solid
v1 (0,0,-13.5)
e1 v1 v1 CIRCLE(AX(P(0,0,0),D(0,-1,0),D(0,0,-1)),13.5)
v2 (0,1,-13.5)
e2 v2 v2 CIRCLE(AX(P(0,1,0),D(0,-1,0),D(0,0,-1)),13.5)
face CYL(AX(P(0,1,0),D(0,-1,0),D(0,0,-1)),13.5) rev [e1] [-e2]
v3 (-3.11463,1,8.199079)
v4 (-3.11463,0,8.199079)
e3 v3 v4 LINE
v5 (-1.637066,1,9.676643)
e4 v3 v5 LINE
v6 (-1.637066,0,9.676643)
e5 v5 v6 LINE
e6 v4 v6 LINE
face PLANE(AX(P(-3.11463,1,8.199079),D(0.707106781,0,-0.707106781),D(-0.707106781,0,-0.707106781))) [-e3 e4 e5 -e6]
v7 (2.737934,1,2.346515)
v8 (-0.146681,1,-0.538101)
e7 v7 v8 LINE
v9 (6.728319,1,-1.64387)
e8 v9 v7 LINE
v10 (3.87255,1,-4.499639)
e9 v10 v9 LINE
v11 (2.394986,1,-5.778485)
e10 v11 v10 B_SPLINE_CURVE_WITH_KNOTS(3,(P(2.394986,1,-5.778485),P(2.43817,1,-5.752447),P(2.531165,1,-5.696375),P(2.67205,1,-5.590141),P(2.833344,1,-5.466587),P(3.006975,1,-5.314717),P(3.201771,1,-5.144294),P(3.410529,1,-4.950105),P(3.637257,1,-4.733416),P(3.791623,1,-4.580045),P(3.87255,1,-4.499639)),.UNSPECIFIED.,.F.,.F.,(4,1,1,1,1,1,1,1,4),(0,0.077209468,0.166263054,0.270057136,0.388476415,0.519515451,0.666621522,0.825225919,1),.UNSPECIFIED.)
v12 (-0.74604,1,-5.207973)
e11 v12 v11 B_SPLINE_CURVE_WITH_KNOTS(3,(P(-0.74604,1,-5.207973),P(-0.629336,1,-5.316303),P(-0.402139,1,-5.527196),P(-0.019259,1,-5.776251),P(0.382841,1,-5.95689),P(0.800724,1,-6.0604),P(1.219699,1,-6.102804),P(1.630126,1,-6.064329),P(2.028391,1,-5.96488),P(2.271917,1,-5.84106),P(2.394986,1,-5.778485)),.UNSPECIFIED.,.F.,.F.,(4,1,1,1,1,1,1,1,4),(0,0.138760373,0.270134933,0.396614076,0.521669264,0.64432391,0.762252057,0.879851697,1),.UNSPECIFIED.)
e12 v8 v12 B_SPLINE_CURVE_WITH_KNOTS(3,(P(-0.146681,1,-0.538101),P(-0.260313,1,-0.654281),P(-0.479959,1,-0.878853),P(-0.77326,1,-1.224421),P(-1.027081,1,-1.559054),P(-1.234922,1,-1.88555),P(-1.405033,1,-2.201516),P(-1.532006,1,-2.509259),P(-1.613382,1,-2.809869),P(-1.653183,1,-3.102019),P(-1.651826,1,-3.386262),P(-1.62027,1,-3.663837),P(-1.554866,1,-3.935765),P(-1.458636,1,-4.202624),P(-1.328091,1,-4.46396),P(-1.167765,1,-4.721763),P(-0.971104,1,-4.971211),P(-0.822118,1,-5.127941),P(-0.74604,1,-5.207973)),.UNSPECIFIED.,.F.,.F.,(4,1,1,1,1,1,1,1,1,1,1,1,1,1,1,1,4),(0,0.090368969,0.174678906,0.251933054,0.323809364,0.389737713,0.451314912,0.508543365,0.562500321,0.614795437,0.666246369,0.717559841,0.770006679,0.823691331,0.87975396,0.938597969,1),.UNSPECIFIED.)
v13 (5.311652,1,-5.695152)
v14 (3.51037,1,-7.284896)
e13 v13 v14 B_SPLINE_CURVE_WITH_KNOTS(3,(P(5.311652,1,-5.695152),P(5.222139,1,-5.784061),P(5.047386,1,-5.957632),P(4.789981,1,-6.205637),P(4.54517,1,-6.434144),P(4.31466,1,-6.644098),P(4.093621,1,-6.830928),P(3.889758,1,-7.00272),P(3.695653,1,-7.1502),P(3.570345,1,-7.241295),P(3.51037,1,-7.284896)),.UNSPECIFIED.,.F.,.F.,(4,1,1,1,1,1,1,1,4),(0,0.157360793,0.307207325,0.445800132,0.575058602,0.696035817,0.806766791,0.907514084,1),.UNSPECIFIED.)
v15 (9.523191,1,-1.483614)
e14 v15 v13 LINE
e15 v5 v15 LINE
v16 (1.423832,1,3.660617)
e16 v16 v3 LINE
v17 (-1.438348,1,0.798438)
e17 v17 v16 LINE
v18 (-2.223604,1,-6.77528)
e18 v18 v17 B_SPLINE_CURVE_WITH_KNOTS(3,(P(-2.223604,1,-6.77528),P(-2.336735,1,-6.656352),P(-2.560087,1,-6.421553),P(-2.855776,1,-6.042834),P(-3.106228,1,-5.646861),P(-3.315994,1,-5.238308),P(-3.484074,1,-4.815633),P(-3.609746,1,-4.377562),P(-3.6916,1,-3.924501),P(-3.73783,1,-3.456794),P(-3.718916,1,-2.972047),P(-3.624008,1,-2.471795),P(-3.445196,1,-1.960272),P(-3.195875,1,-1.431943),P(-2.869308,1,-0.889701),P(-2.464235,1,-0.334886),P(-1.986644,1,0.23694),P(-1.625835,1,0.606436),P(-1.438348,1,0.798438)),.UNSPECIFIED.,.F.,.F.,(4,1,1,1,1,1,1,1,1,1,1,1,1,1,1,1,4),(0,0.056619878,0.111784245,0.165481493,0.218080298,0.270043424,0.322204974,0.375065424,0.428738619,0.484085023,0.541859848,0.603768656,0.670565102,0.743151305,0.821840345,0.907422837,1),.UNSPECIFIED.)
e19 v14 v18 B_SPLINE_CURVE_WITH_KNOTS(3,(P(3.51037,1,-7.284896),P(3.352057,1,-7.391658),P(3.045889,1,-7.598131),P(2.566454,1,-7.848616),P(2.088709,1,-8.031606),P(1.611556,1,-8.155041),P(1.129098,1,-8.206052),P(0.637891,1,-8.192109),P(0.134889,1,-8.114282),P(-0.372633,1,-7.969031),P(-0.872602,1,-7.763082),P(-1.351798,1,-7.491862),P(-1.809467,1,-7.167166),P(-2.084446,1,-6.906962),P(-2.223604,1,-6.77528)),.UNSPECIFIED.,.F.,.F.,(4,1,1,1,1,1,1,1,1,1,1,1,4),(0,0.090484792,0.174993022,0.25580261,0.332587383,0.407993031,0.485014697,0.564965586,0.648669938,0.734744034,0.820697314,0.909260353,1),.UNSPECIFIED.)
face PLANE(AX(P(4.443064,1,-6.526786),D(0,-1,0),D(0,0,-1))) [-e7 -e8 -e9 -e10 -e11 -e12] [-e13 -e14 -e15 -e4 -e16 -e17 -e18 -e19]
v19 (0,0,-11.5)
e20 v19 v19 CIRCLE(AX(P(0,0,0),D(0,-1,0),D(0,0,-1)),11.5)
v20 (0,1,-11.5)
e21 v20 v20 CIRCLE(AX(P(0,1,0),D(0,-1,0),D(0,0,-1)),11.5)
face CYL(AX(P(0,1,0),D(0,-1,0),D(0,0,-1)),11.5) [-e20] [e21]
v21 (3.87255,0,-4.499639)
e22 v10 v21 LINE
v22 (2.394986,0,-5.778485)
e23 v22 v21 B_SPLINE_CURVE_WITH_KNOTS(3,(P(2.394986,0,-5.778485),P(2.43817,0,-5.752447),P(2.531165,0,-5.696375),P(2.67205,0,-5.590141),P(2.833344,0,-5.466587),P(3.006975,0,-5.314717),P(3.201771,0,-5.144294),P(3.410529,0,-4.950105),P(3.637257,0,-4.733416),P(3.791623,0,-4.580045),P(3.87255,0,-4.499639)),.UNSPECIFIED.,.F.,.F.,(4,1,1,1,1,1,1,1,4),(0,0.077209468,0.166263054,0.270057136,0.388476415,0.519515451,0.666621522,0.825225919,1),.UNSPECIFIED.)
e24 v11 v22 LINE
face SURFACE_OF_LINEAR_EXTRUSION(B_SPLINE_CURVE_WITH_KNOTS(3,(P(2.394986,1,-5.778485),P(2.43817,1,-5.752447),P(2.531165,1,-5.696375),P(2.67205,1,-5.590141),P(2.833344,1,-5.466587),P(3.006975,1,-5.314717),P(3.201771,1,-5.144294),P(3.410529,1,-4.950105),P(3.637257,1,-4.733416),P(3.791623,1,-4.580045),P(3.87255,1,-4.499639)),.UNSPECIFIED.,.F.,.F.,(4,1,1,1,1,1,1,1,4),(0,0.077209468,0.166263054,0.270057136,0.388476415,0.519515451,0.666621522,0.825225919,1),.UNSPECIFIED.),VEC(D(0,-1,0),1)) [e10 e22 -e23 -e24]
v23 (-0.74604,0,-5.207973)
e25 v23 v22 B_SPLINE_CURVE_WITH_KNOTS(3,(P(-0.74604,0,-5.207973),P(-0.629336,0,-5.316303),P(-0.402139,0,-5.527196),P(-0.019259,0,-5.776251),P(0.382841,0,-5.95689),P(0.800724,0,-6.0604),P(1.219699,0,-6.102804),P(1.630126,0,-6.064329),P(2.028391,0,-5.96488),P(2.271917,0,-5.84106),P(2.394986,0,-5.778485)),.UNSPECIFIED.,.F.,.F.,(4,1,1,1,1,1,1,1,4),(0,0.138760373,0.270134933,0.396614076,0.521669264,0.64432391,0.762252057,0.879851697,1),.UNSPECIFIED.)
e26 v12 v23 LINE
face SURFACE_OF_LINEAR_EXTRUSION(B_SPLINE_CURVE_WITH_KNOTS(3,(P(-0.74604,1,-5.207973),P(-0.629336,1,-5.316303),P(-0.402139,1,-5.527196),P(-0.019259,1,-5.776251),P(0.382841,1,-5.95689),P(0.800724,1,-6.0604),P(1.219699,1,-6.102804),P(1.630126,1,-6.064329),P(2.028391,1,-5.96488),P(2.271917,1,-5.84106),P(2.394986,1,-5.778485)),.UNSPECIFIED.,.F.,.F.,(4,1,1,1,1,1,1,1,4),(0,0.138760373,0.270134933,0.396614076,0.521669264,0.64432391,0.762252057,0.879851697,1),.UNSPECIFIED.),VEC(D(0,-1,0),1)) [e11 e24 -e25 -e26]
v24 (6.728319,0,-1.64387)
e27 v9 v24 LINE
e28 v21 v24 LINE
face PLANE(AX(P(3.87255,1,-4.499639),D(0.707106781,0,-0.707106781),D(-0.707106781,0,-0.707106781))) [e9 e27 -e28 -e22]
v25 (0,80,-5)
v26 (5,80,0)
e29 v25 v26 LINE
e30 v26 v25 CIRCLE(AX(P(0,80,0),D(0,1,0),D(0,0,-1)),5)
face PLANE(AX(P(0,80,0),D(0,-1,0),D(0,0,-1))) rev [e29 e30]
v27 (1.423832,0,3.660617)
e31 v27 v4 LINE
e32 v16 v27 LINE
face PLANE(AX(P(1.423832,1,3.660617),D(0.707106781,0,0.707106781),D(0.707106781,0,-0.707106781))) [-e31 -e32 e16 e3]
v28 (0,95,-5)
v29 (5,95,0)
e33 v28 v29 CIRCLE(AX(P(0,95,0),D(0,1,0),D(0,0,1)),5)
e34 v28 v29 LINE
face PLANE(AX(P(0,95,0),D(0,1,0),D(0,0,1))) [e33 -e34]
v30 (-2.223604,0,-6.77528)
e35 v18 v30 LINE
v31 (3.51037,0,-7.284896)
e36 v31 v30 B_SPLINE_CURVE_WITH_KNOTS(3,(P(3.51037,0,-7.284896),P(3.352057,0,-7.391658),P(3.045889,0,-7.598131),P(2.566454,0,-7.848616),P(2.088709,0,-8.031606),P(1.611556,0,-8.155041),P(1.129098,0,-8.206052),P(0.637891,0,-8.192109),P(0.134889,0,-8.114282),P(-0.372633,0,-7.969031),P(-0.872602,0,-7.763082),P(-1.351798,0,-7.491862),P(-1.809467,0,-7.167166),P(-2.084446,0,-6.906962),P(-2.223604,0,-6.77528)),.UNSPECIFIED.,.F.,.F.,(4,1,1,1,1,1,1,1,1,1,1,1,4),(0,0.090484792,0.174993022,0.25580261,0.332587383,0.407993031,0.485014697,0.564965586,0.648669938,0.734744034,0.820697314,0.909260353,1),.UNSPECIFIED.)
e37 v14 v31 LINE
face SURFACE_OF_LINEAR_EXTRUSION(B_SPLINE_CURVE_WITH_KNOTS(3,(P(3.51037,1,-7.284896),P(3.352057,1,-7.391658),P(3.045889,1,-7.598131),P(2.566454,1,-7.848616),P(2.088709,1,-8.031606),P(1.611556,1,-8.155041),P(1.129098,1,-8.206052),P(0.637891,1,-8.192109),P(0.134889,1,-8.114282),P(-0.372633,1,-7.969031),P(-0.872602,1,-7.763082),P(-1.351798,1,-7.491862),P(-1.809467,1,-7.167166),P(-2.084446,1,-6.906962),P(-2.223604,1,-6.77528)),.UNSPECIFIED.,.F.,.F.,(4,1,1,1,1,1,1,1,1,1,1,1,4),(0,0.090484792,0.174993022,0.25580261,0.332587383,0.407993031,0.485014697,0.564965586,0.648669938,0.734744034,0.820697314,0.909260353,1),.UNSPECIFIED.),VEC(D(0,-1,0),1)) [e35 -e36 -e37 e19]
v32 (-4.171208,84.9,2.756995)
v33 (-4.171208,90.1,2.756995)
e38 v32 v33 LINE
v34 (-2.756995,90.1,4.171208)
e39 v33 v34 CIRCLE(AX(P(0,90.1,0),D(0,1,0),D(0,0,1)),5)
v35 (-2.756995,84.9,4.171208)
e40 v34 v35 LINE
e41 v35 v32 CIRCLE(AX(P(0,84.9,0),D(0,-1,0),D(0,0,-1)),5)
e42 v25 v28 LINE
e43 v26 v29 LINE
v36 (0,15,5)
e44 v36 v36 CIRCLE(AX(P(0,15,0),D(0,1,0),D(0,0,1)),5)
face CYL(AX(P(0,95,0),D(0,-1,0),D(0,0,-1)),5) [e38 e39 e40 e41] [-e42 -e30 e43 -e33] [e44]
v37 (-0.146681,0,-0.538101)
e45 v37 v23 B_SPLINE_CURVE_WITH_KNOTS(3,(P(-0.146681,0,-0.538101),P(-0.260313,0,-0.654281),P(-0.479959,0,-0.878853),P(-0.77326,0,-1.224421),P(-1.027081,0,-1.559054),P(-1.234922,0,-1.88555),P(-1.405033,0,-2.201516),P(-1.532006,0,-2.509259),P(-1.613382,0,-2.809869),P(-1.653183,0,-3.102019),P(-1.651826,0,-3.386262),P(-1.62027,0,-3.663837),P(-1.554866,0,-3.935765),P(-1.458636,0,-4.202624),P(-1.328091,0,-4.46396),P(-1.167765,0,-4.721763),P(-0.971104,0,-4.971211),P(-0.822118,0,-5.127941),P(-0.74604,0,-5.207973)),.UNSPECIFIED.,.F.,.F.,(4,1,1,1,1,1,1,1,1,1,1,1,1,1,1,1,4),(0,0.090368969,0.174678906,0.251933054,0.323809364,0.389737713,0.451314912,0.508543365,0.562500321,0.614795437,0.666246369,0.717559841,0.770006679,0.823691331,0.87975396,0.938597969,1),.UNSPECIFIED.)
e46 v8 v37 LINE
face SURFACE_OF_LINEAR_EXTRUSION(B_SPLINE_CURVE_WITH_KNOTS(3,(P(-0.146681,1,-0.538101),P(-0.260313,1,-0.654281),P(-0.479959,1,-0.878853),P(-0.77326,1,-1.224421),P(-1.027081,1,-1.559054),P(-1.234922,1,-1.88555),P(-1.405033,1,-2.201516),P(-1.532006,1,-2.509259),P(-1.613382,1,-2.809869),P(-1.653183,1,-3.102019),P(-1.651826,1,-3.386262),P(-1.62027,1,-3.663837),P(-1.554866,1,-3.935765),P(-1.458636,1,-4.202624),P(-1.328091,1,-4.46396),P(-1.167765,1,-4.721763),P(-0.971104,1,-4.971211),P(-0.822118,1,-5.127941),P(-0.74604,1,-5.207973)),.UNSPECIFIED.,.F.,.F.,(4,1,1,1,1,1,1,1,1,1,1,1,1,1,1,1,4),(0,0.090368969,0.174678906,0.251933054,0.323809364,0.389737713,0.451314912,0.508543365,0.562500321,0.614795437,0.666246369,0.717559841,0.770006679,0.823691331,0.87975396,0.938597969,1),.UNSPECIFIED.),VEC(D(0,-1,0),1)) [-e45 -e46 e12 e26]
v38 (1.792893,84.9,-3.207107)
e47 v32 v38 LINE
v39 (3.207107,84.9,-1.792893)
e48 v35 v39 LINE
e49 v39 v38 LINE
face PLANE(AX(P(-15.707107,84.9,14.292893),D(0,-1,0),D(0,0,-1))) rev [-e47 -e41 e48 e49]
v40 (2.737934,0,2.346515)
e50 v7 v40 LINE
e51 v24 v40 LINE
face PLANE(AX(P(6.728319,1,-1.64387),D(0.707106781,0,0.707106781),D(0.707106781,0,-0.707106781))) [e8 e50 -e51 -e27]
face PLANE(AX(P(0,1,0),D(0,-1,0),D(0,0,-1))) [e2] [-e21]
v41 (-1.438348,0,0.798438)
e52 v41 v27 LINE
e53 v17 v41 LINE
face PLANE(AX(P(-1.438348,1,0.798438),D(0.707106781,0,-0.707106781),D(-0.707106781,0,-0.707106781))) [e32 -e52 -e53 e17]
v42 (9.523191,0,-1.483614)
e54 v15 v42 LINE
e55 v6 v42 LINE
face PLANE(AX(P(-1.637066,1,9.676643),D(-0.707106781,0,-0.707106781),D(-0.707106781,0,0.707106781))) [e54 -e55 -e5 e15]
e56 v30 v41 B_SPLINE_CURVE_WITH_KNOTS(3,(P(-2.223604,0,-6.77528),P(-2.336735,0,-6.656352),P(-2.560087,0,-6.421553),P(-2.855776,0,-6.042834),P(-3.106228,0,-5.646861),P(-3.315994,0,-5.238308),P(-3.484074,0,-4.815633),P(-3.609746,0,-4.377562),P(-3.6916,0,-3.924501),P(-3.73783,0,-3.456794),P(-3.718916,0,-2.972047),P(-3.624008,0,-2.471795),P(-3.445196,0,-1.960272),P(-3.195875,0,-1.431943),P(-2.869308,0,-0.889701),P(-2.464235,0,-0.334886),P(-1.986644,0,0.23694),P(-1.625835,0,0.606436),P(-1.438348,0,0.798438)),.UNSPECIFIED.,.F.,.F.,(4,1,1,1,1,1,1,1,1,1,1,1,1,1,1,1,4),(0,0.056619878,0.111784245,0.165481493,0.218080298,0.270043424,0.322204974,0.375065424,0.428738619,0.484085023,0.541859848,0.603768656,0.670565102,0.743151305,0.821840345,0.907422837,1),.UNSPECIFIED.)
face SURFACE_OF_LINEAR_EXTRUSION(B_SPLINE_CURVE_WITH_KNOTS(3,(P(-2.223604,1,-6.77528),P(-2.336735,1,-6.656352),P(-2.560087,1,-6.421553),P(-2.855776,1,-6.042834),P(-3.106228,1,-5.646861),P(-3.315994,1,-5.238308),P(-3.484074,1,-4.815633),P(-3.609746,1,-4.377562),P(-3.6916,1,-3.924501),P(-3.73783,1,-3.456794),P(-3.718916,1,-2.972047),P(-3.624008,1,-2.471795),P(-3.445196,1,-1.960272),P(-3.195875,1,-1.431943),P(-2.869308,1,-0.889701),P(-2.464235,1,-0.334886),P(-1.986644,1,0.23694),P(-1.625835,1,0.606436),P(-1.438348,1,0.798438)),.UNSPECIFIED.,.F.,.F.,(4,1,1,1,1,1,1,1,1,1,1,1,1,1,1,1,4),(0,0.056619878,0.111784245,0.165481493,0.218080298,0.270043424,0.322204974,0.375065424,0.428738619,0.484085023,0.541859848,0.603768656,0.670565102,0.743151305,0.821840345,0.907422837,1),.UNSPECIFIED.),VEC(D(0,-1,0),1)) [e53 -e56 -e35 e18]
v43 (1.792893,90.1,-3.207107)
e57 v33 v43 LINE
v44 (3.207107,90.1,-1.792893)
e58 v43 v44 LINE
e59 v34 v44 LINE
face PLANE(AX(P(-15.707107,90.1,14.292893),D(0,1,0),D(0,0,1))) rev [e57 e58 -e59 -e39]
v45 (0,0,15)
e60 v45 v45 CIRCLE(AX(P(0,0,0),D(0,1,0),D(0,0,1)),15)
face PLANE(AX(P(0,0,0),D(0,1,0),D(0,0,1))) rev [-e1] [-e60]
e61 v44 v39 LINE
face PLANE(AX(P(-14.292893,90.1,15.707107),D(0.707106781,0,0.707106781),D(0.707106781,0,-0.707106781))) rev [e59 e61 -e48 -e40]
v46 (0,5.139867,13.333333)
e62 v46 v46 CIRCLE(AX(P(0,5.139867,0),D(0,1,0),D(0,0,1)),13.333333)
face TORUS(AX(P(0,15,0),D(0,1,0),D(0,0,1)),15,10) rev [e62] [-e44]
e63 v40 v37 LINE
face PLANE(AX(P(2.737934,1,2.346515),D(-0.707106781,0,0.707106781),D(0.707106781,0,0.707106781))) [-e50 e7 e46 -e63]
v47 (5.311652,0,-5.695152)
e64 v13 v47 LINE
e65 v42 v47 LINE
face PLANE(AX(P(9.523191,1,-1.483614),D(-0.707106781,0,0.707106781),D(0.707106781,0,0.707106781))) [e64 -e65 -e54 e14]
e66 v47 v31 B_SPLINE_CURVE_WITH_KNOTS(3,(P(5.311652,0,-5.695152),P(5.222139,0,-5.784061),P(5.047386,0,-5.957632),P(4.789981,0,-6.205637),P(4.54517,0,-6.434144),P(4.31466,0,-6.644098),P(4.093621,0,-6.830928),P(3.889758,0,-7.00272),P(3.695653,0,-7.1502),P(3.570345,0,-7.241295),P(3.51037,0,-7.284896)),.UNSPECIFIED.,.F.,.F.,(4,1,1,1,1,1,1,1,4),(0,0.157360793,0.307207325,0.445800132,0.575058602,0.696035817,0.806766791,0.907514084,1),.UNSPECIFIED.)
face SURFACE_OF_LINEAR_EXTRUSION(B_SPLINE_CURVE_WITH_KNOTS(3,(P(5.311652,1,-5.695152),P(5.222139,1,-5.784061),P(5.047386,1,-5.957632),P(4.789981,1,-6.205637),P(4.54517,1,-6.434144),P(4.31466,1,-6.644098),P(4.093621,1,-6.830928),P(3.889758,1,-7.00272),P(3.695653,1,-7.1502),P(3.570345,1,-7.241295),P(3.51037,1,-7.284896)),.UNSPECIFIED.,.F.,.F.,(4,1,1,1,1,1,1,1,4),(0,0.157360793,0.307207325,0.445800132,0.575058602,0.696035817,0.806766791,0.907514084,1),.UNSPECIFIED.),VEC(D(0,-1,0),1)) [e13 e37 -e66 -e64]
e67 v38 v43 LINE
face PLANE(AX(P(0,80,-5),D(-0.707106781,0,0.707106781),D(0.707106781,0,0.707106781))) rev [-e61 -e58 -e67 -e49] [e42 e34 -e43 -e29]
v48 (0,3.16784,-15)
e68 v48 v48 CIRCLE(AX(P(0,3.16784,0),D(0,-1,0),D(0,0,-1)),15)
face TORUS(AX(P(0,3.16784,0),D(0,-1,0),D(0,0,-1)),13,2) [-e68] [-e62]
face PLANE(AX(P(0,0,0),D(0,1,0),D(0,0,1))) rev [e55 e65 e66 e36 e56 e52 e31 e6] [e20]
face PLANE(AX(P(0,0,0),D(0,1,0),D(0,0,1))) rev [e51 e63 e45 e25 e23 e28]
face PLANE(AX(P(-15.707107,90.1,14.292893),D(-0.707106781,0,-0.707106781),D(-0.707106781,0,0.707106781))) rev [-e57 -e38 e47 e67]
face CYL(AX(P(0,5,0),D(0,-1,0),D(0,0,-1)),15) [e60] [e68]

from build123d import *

# Parameters (mm, degrees)
SKETCH1_R           = 15
BOSS_EXTRUDE1_DEPTH = 5
SKETCH2_R           = 5
BOSS_EXTRUDE2_DEPTH = 90
CUT_EXTRUDE1_START  = -15
CUT_EXTRUDE1_DEPTH  = 15
SKETCH4_W           = 2
SKETCH4_H           = 5.2
CUT_EXTRUDE2_DEPTH  = 99.17076958
FILLET1_R           = 10
FILLET2_R           = 2
CUT_EXTRUDE3_DEPTH  = 1
SKETCH6_R           = 13.5
SKETCH6_R_2         = 11.5
CUT_EXTRUDE4_DEPTH  = 1


with BuildPart() as part:
    # Sketch1 → Boss-Extrude1 (new body)
    with BuildSketch(Plane(origin=(0, 0, 0), x_dir=(1, 0, 0), z_dir=(0, 1, 0))):
        with Locations(Location((0, 0, 0), (0, 0, 270))):
            Circle(SKETCH1_R)
    extrude(amount=BOSS_EXTRUDE1_DEPTH)

    # Sketch2 → Boss-Extrude2 (add)
    with BuildSketch(Plane(origin=(0, 5, 0), x_dir=(1, 0, 0), z_dir=(0, 1, 0))):
        with Locations(Location((0, 0, 0), (0, 0, 90))):
            Circle(SKETCH2_R)
    extrude(amount=BOSS_EXTRUDE2_DEPTH)

    # Sketch3 → Cut-Extrude1 (cut)
    with BuildSketch(Plane(origin=(0, 95, 0), x_dir=(1, 0, 0), z_dir=(0, 1, 0)).offset(CUT_EXTRUDE1_START)):
        with BuildLine():
            Line((0, 5), (5, 0))
            ThreePointArc((5, 0), (3.535533906, 3.535533906), (0, 5))
        make_face()
    extrude(amount=CUT_EXTRUDE1_DEPTH, mode=Mode.SUBTRACT)

    # Sketch4 → Cut-Extrude2 (cut, through all)
    with BuildSketch(Plane(origin=(2.5, 0, -2.5), x_dir=(-0.7071067811865475, 0, -0.7071067811865477), z_dir=(0.7071067811865477, 0, -0.7071067811865475))):
        with Locations((0, 87.5)):
            Rectangle(SKETCH4_W, SKETCH4_H)
    extrude(amount=-CUT_EXTRUDE2_DEPTH, mode=Mode.SUBTRACT)

    # Fillet1
    fillet1_edges = [part.edges().sort_by_distance(p)[0] for p in [
        (0, 5, 5),
    ]]
    fillet(fillet1_edges, radius=FILLET1_R - 0.0001)  # a hair under: the kernel refuses the full size

    # Fillet2
    fillet2_edges = [part.edges().sort_by_distance(p)[0] for p in [
        (0, 5, -15),
    ]]
    fillet(fillet2_edges, radius=FILLET2_R)

    # Sketch5 → Cut-Extrude3 (cut)
    with BuildSketch(Plane.XZ):
        with BuildLine():
            Line((-1.637065711, 9.676642787), (9.523190699, -1.483613623))
            Line((9.523190699, -1.483613623), (5.311652237, -5.695152084))
            add(Edge.make_bspline(
                [(5.311652237, -5.695152084), (5.222138514, -5.784060594), (5.04738551, -5.957632072), (4.789980879, -6.205637327), (4.545170464, -6.434144406), (4.314659572, -6.644098006), (4.09362148, -6.830927906), (3.889758382, -7.002719589), (3.69565283, -7.150200035), (3.570345293, -7.241295339), (3.510370186, -7.284895674)],
                knots=[0, 0, 0, 0, 1.258886347, 2.457658598, 3.566401057, 4.600468819, 5.568286539, 6.454134328, 7.260112675, 8, 8, 8, 8], degree=3))
            add(Edge.make_bspline(
                [(3.510370186, -7.284895674), (3.352057488, -7.391657893), (3.045888719, -7.598130638), (2.566454347, -7.848616029), (2.088709315, -8.031605789), (1.611555846, -8.155041162), (1.129098311, -8.206051584), (0.637891361, -8.192108975), (0.134888923, -8.11428248), (-0.372633356, -7.969030769), (-0.872601546, -7.763082396), (-1.351797855, -7.491862034), (-1.809467136, -7.167166368), (-2.084445811, -6.906961882), (-2.223604173, -6.775280289)],
                knots=[0, 0, 0, 0, 1.085817505, 2.099916266, 3.069631314, 3.991048598, 4.895916369, 5.820176367, 6.779587027, 7.784039251, 8.816928408, 9.848367769, 10.911124231, 12, 12, 12, 12], degree=3))
            add(Edge.make_bspline(
                [(-2.223604173, -6.775280289), (-2.336734542, -6.656352184), (-2.56008707, -6.421553226), (-2.855775684, -6.042833727), (-3.106227984, -5.64686054), (-3.315994358, -5.238308237), (-3.484073648, -4.815633421), (-3.609745523, -4.377562245), (-3.691600055, -3.924500762), (-3.737830146, -3.456793519), (-3.718915595, -2.972046746), (-3.62400832, -2.471794707), (-3.445196287, -1.960272191), (-3.195874633, -1.431943292), (-2.869308405, -0.889700641), (-2.464234681, -0.334885684), (-1.986644206, 0.236940057), (-1.625835114, 0.606436234), (-1.438347763, 0.798437659)],
                knots=[0, 0, 0, 0, 0.905918046, 1.788547915, 2.647703894, 3.489284766, 4.320694788, 5.155279578, 6.001046779, 6.859817908, 7.745360365, 8.669757575, 9.660298499, 10.729041634, 11.890420876, 13.149445516, 14.5187654, 16, 16, 16, 16], degree=3))
            Line((-1.438347763, 0.798437659), (1.423831724, 3.660617146))
            Line((1.423831724, 3.660617146), (-3.114629814, 8.199078685))
            Line((-3.114629814, 8.199078685), (-1.637065711, 9.676642787))
        make_face()
        with BuildLine():
            Line((2.737934289, 2.346514582), (-0.146681096, -0.538100802))
            add(Edge.make_bspline(
                [(-0.146681096, -0.538100802), (-0.260313381, -0.65428127), (-0.479959168, -0.878852573), (-0.773260091, -1.224420889), (-1.027081256, -1.559053853), (-1.234921637, -1.885549874), (-1.405033378, -2.201516333), (-1.532005524, -2.509259236), (-1.61338181, -2.809868657), (-1.653183343, -3.102018529), (-1.651825971, -3.386261795), (-1.620270356, -3.663837107), (-1.554866401, -3.935764915), (-1.458636403, -4.202624086), (-1.328091019, -4.463959906), (-1.167765432, -4.721763246), (-0.971104209, -4.971210552), (-0.822117923, -5.127940531), (-0.74604007, -5.207972597)],
                knots=[0, 0, 0, 0, 1.445903498, 2.794862496, 4.030928865, 5.180949829, 6.23580341, 7.221038598, 8.136693834, 9.000005142, 9.836726991, 10.659941899, 11.480957457, 12.32010686, 13.179061295, 14.076063356, 15.017567502, 16, 16, 16, 16], degree=3))
            add(Edge.make_bspline(
                [(-0.74604007, -5.207972597), (-0.6293357, -5.316302566), (-0.402138795, -5.527196413), (-0.019259163, -5.776250817), (0.382841414, -5.956890263), (0.800723528, -6.060399706), (1.219698662, -6.102803811), (1.630125751, -6.06432865), (2.028390936, -5.964880448), (2.271917157, -5.841059549), (2.394985571, -5.778485418)],
                knots=[0, 0, 0, 0, 1.110082986, 2.161079462, 3.172912607, 4.173354109, 5.154591278, 6.098016453, 7.038813575, 8, 8, 8, 8], degree=3))
            add(Edge.make_bspline(
                [(2.394985571, -5.778485418), (2.438170358, -5.752446879), (2.531164584, -5.696375427), (2.67205046, -5.59014108), (2.83334386, -5.466586503), (3.006975281, -5.314717262), (3.201771433, -5.144293582), (3.410529337, -4.950105092), (3.637256703, -4.7334163), (3.791622967, -4.580044579), (3.872549673, -4.499639264)],
                knots=[0, 0, 0, 0, 0.617675747, 1.330104431, 2.160457084, 3.107811318, 4.156123608, 5.332972174, 6.601807352, 8, 8, 8, 8], degree=3))
            Line((3.872549673, -4.499639264), (6.728318904, -1.643870033))
            Line((6.728318904, -1.643870033), (2.737934289, 2.346514582))
        make_face(mode=Mode.SUBTRACT)
    extrude(amount=-CUT_EXTRUDE3_DEPTH, mode=Mode.SUBTRACT)

    # Sketch6 → Cut-Extrude4 (cut)
    with BuildSketch(Plane.XZ):
        with Locations(Location((0, 0, 0), (0, 0, 270))):
            Circle(SKETCH6_R)
        with Locations(Location((0, 0, 0), (0, 0, 270))):
            Circle(SKETCH6_R_2, mode=Mode.SUBTRACT)
    extrude(amount=-CUT_EXTRUDE4_DEPTH, mode=Mode.SUBTRACT)


solid = part.part
